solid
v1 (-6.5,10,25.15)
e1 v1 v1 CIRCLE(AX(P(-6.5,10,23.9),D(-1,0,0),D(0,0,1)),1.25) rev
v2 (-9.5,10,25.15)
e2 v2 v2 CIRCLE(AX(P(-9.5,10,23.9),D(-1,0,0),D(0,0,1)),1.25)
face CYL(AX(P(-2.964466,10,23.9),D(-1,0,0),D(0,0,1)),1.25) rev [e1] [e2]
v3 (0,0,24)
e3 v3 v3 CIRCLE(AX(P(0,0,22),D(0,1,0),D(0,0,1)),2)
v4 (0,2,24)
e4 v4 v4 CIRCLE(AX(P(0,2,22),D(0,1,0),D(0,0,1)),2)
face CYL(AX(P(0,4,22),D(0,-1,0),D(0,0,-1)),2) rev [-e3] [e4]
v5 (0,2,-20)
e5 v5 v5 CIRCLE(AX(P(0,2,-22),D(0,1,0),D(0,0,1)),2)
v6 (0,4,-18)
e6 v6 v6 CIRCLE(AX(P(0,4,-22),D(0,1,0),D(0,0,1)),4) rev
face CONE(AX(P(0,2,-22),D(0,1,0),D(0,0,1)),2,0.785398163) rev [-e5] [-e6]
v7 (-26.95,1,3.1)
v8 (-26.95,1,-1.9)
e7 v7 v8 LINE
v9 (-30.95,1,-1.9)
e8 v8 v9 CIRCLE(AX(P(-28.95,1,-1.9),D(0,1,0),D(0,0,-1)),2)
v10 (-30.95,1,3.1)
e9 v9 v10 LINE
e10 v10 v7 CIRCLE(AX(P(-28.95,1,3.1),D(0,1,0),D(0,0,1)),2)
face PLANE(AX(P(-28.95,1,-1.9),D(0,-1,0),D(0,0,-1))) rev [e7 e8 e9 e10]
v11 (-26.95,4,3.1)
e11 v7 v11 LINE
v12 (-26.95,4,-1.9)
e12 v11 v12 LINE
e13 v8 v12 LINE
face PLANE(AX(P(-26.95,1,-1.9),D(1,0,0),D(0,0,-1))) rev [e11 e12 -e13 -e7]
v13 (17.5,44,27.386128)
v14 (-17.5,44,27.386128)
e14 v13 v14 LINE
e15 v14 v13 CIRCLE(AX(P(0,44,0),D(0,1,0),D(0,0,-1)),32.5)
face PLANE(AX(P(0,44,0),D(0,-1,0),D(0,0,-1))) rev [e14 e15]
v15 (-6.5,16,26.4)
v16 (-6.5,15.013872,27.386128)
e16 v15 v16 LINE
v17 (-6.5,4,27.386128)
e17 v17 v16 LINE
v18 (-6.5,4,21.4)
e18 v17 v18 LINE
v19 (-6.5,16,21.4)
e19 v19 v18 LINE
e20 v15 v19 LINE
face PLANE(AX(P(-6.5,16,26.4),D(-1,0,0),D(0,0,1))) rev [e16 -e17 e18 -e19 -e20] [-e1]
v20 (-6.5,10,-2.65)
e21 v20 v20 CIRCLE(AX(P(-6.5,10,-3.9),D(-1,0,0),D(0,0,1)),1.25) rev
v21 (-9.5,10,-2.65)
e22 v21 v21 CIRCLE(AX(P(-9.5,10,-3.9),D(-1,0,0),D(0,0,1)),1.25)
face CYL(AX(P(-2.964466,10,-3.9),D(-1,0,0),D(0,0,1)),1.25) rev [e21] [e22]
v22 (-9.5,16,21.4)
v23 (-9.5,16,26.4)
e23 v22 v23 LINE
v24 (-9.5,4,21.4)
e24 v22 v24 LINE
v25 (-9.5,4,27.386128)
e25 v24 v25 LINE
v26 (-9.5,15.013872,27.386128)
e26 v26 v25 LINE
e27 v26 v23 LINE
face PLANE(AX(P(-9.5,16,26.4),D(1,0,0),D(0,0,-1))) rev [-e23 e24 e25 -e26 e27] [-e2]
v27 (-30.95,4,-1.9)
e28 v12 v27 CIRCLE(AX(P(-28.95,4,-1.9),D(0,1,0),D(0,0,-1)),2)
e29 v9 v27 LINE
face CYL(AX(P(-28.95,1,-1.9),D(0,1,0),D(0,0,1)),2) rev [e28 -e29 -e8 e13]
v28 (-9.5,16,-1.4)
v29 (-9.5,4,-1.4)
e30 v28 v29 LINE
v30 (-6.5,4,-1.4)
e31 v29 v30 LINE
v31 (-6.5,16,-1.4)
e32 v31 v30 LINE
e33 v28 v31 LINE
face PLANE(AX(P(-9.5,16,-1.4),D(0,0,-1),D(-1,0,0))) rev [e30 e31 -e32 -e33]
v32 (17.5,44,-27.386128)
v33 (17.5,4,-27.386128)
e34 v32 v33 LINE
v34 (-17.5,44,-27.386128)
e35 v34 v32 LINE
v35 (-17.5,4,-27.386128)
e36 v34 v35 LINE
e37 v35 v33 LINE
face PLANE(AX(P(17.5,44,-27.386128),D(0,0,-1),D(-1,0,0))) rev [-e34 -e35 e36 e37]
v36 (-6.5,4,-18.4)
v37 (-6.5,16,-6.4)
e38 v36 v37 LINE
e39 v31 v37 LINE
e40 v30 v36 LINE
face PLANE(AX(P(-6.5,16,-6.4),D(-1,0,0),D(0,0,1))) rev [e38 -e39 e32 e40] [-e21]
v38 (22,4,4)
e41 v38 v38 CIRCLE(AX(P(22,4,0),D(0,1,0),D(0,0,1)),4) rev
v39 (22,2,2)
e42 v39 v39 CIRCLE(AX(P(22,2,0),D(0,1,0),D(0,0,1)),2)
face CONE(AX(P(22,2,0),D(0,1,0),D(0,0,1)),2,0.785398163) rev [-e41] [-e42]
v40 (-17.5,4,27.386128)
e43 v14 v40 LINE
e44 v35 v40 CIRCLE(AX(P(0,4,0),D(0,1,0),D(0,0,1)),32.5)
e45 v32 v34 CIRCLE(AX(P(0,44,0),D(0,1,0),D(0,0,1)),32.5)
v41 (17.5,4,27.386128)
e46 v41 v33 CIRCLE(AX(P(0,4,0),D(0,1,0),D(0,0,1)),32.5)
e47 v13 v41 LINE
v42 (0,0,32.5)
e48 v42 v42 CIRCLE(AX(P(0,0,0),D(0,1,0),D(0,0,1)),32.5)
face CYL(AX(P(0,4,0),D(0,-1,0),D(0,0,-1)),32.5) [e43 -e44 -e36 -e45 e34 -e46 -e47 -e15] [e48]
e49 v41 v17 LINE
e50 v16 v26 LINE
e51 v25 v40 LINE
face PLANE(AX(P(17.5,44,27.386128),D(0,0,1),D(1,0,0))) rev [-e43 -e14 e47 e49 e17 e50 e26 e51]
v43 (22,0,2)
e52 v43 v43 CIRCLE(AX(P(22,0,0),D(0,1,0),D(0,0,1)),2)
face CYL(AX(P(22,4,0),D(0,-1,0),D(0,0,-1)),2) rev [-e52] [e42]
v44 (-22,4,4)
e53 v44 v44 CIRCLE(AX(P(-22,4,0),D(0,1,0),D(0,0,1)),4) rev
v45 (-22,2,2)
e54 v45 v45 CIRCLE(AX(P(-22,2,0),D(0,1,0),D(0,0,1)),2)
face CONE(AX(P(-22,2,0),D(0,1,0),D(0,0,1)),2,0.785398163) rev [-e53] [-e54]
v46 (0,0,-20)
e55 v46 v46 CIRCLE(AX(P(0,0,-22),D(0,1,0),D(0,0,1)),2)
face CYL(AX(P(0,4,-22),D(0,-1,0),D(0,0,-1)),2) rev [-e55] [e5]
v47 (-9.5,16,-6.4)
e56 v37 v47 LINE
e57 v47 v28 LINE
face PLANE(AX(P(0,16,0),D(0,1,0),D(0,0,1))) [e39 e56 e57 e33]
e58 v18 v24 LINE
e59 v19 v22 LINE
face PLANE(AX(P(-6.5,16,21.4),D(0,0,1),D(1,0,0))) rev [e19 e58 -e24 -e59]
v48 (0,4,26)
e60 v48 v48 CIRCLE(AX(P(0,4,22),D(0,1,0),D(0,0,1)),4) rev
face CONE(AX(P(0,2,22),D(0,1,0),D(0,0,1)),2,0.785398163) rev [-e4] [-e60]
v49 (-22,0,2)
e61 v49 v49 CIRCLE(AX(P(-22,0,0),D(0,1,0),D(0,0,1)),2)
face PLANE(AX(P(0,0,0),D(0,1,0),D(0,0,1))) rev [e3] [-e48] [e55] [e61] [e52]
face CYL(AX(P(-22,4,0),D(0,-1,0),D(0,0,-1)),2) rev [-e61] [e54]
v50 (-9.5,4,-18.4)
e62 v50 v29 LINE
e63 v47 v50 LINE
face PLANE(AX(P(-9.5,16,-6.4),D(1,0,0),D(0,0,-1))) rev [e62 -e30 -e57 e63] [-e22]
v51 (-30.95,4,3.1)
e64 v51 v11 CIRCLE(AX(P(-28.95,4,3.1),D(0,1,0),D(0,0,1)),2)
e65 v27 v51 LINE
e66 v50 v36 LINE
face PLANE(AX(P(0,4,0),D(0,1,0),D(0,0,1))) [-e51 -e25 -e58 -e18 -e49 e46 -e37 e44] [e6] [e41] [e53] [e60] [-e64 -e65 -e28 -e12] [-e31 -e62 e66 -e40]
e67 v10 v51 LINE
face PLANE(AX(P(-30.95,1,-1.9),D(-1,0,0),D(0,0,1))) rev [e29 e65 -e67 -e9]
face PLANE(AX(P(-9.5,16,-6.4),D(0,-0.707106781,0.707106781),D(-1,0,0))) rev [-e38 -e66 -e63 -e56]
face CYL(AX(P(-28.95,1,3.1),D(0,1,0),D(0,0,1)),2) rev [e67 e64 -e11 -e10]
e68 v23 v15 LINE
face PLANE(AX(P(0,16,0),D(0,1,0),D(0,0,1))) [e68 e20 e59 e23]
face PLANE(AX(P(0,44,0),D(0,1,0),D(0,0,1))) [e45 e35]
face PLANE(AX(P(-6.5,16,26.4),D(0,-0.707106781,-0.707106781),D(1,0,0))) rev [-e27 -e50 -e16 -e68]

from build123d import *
from build123d.topology import SkipClean

# Parameters (mm, degrees)
SKETCH1_R           = 32.5
SKETCH1_R_2         = 2
BOSS_EXTRUDE1_DEPTH = 4
BOSS_EXTRUDE2_DEPTH = 40
CHAMFER1_SIZE       = 2
SKETCH3_W           = 3
SKETCH3_H           = 5
BOSS_EXTRUDE3_DEPTH = 12
SKETCH4_R           = 1.25
CUT_EXTRUDE1_DEPTH  = 3
CUT_EXTRUDE2_DEPTH  = 3
CHAMFER3_SIZE       = 12


with BuildPart() as part:
    # Sketch1 → Boss-Extrude1 (new body)
    with BuildSketch(Plane(origin=(0, 0, 0), x_dir=(1, 0, 0), z_dir=(0, 1, 0))):
        with Locations(Location((0, 0, 0), (0, 0, 270))):
            Circle(SKETCH1_R)
        with Locations(Location((-22, 0, 0), (0, 0, 270))):
            Circle(SKETCH1_R_2, mode=Mode.SUBTRACT)
        with Locations(Location((0, 22, 0), (0, 0, 270))):
            Circle(SKETCH1_R_2, mode=Mode.SUBTRACT)
        with Locations(Location((22, 0, 0), (0, 0, 270))):
            Circle(SKETCH1_R_2, mode=Mode.SUBTRACT)
        with Locations(Location((0, -22, 0), (0, 0, 270))):
            Circle(SKETCH1_R_2, mode=Mode.SUBTRACT)
    extrude(amount=BOSS_EXTRUDE1_DEPTH)

    # Sketch2 → Boss-Extrude2 (add)
    with SkipClean():  # the faces are left unmerged after this step: merging them gives an invalid solid
        with BuildSketch(Plane(origin=(0, 4, 0), x_dir=(1, 0, 0), z_dir=(0, 1, 0))):
            with BuildLine():
                Line((17.5, 27.386127875), (-17.5, 27.386127875))
                ThreePointArc((-17.5, 27.386127875), (0, 32.5), (17.5, 27.386127875))
            make_face()
            with BuildLine():
                Line((17.5, -27.386127875), (-17.5, -27.386127875))
                ThreePointArc((-17.5, -27.386127875), (0, -32.5), (17.5, -27.386127875))
            make_face()
        extrude(amount=BOSS_EXTRUDE2_DEPTH)

    # Chamfer1
    chamfer1_edges = [part.edges().sort_by_distance(p)[0] for p in [
        (22, 4, -2),
        (0, 4, 20),
        (-22, 4, -2),
        (0, 4, -24),
    ]]
    chamfer(chamfer1_edges, length=CHAMFER1_SIZE)

    # Sketch3 → Boss-Extrude3 (add)
    with SkipClean():  # the faces are left unmerged after this step: merging them gives an invalid solid
        with BuildSketch(Plane(origin=(0, 4, 0), x_dir=(1, 0, 0), z_dir=(0, 1, 0))):
            with Locations((-8, 3.9)):
                Rectangle(SKETCH3_W, SKETCH3_H)
            with Locations((-8, -23.9)):
                Rectangle(SKETCH3_W, SKETCH3_H)
        extrude(amount=BOSS_EXTRUDE3_DEPTH)

    # Sketch4 → Cut-Extrude1 (cut)
    with SkipClean():  # the faces are left unmerged after this step: merging them gives an invalid solid
        with BuildSketch(Plane.ZY.offset(9.5)):
            with Locations((-3.9, 10)):
                Circle(SKETCH4_R)
            with Locations((23.9, 10)):
                Circle(SKETCH4_R)
        extrude(amount=-CUT_EXTRUDE1_DEPTH, mode=Mode.SUBTRACT)

    # Sketch5 → Cut-Extrude2 (cut)
    with SkipClean():  # the faces are left unmerged after this step: merging them gives an invalid solid
        with BuildSketch(Plane(origin=(0, 4, 0), x_dir=(1, 0, 0), z_dir=(0, 1, 0))):
            with BuildLine():
                Line((-30.95, 1.9), (-30.95, -3.1))
                ThreePointArc((-30.95, -3.1), (-28.95, -5.1), (-26.95, -3.1))
                Line((-26.95, -3.1), (-26.95, 1.9))
                ThreePointArc((-26.95, 1.9), (-28.95, 3.9), (-30.95, 1.9))
            make_face()
        extrude(amount=-CUT_EXTRUDE2_DEPTH, mode=Mode.SUBTRACT)

    # Chamfer3
    # the kernel refuses this chamfer: 12 mm, written as the material it adds along each edge
    with BuildSketch(Plane(origin=(-9.5, 4, -6.4), x_dir=(0, -0.02749587661058638, -0.9996219169112968), z_dir=(1, 0, 0))) as chamfer3_piece_1_section:
        Polygon((CHAMFER3_SIZE * 0.999621916911, CHAMFER3_SIZE * 0.0274958766106), (-CHAMFER3_SIZE * 0.0274958766106, CHAMFER3_SIZE * 0.999621916911), (0, 0), align=None)
    chamfer3_piece_1 = extrude(amount=3, mode=Mode.PRIVATE)
    chamfer3_piece_1 = split(chamfer3_piece_1, bisect_by=Plane(origin=(-8, 16, -10.364849852), z_dir=(0, -1, 0)), keep=Keep.TOP, mode=Mode.PRIVATE)
    add(chamfer3_piece_1)
    with BuildSketch(Plane(origin=(-6.5, 4, 26.4), x_dir=(-1.1837901526131805e-15, -0.027495876610586386, 0.9996219169112968), z_dir=(-1, 0, 0))) as chamfer3_piece_2_section:
        Polygon((CHAMFER3_SIZE * 0.999621916911, CHAMFER3_SIZE * 0.0274958766106), (-CHAMFER3_SIZE * 0.0274958766106, CHAMFER3_SIZE * 0.999621916911), (0, 0), align=None)
    chamfer3_piece_2 = extrude(amount=3, mode=Mode.PRIVATE)
    chamfer3_piece_2 = chamfer3_piece_2 & Plane(origin=(0, 8.886128488, 0), x_dir=(0, 0, 1), z_dir=(0, -1, 0)) * Cylinder(32.5, 54, mode=Mode.PRIVATE)
    chamfer3_piece_2 = split(chamfer3_piece_2, bisect_by=Plane(origin=(-7.974151993, 16, 28.556689734), z_dir=(0, -1, 0)), keep=Keep.TOP, mode=Mode.PRIVATE)
    add(chamfer3_piece_2)


solid = part.part
